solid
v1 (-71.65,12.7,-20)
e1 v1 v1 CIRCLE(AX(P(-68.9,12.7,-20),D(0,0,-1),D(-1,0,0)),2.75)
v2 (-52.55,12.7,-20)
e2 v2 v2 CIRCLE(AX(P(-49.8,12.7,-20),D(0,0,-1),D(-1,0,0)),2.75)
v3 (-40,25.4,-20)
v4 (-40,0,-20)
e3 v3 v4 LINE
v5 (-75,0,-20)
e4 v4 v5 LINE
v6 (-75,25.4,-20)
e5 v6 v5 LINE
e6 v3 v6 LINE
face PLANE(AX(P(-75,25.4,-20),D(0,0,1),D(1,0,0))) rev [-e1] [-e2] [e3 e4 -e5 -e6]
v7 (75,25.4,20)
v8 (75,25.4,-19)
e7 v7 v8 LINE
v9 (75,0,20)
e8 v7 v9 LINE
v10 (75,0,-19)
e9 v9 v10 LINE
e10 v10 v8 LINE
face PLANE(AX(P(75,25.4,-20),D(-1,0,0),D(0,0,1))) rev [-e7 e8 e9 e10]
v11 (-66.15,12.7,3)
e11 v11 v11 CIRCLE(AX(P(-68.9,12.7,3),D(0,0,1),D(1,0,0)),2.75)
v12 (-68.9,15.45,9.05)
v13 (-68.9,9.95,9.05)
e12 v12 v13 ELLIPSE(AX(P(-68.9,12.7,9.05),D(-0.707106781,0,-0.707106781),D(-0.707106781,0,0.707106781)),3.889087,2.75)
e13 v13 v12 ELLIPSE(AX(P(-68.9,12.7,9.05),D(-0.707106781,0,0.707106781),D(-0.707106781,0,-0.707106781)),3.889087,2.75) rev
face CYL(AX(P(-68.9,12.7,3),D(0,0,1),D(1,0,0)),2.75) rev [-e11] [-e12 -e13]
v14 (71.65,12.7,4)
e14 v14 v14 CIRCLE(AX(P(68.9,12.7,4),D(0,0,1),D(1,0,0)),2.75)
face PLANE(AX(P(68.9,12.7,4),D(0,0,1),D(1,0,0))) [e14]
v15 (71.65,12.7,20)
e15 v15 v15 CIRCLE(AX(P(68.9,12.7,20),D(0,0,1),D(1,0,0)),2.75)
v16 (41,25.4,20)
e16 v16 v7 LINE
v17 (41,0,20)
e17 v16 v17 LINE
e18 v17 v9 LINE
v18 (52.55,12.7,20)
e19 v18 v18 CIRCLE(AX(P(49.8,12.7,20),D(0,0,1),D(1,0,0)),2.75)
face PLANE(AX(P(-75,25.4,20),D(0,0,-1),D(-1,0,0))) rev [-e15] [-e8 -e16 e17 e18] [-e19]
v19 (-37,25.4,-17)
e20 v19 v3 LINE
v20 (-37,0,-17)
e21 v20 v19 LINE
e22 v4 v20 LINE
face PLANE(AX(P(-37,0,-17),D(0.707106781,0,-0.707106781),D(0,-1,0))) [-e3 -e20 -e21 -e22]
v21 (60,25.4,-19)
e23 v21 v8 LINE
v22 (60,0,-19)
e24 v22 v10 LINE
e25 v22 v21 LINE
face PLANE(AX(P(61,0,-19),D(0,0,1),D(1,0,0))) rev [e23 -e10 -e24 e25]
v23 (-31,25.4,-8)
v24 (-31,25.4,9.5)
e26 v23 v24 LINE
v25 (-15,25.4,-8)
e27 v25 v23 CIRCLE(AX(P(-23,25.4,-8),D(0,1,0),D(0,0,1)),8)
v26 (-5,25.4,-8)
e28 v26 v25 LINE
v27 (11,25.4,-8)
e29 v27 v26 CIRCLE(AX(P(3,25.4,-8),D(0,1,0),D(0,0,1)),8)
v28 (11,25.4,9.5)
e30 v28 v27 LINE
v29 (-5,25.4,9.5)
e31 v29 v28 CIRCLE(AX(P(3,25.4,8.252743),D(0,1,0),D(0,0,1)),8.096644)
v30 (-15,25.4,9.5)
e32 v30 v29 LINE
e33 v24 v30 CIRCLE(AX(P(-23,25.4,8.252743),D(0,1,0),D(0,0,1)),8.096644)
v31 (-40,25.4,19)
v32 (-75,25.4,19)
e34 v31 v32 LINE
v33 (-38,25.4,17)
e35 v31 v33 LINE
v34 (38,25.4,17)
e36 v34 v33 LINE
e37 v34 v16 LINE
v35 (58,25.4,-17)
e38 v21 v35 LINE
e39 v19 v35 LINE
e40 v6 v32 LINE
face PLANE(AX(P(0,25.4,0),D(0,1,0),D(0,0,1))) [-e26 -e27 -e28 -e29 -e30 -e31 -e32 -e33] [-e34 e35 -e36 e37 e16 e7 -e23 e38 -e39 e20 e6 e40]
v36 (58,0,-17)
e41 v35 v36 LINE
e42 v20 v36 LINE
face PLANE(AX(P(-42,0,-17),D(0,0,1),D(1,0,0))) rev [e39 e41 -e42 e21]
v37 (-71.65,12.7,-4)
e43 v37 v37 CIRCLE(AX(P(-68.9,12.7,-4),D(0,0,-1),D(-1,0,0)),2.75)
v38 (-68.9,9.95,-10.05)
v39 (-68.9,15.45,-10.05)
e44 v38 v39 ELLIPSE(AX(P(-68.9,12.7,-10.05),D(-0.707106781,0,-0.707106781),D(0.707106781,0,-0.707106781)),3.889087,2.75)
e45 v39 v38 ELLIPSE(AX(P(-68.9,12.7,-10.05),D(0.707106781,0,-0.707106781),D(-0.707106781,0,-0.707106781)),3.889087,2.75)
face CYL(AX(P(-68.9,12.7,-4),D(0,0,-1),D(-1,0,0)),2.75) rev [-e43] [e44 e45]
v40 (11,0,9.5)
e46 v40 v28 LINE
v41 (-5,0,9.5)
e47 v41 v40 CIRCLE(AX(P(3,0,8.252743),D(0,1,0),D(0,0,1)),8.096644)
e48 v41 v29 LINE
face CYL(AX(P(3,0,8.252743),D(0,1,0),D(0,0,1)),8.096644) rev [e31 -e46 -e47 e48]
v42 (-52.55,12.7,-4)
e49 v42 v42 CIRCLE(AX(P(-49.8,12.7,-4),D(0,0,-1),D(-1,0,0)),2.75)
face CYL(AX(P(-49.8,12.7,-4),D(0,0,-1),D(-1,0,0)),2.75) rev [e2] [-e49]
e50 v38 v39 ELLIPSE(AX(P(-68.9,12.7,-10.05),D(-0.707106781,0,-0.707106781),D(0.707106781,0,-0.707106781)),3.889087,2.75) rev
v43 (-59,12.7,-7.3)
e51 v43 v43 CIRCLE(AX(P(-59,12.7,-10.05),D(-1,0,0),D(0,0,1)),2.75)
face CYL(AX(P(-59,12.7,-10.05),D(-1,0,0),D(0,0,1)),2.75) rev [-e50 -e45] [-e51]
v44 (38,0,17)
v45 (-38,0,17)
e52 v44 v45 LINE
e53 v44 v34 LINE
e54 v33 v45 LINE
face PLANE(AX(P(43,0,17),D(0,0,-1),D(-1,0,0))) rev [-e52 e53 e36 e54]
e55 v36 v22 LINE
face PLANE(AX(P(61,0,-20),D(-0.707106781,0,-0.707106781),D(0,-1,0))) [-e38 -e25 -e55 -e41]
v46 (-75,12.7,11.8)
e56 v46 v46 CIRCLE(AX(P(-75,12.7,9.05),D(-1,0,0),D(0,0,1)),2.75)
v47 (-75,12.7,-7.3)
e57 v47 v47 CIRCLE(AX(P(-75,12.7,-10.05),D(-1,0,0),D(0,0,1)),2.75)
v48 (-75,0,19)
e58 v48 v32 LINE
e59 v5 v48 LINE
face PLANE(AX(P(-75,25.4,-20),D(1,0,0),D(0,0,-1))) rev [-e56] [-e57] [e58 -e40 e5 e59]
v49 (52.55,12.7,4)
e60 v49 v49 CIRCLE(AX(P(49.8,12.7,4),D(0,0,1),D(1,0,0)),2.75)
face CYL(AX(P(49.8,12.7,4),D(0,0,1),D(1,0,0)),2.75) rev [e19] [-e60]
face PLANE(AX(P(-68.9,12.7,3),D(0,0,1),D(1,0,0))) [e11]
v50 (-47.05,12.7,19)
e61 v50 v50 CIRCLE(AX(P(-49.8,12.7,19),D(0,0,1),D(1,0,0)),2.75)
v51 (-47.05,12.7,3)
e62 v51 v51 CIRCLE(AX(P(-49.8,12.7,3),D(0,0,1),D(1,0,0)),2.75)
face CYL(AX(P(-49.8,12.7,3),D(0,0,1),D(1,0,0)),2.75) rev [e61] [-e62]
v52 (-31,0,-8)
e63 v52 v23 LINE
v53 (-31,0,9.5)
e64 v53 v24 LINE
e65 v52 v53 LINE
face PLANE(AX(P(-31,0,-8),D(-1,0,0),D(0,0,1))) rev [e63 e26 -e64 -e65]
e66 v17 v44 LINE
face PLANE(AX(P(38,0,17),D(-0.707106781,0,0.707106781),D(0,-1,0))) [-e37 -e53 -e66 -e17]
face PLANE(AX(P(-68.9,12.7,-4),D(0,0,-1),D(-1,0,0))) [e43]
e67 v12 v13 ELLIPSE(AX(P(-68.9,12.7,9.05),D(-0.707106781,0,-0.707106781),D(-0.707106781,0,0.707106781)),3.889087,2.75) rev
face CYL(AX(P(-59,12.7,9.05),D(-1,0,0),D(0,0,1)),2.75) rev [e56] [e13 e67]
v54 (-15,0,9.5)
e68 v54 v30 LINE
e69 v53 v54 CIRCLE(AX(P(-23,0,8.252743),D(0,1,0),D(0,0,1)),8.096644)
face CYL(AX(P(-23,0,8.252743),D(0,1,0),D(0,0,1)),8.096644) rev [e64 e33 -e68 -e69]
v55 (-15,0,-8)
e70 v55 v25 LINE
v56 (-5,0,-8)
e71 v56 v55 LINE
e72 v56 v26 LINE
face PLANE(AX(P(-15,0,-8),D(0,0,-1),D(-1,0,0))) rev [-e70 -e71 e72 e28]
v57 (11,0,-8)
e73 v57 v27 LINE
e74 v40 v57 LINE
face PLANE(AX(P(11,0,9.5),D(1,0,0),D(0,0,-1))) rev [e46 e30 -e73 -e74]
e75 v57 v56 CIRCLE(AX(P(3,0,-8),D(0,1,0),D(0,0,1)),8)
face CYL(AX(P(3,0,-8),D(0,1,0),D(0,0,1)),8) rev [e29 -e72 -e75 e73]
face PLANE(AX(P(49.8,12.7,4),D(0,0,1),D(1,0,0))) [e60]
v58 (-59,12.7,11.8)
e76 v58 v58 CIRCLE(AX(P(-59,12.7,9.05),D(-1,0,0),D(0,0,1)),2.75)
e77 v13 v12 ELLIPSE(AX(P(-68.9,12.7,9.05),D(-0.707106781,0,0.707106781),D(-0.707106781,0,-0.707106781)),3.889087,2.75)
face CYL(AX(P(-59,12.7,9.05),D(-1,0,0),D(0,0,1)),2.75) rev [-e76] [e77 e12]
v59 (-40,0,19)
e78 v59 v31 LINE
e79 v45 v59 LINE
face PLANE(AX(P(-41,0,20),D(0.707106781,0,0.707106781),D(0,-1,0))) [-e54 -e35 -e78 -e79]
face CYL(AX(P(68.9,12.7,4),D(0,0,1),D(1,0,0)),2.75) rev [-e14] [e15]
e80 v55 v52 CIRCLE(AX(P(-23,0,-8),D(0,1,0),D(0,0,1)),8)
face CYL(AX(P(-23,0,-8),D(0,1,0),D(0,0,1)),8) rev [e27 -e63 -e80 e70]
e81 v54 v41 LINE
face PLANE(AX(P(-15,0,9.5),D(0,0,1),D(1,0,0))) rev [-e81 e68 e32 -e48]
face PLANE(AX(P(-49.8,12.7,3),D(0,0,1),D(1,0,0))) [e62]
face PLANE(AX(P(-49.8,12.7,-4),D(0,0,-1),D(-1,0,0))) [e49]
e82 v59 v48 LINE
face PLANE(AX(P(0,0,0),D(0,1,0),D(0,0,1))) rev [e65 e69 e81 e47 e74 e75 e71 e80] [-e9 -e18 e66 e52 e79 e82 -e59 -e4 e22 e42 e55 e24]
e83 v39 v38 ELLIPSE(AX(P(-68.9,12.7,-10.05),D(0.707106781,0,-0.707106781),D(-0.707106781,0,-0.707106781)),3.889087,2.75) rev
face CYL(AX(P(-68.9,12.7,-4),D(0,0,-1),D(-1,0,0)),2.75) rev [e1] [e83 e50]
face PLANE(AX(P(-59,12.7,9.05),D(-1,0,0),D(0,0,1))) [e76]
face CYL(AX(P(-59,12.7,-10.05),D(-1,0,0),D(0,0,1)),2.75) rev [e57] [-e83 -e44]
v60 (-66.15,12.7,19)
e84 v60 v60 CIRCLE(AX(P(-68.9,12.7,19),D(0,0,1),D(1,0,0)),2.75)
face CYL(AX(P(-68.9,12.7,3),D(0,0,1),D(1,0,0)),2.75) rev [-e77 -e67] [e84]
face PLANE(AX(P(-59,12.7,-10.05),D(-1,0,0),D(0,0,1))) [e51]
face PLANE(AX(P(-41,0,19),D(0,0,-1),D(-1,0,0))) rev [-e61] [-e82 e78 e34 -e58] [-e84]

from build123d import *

# Parameters (mm, degrees)
CROQUIS1_W              = 150
CROQUIS1_H              = 40
SALIENTE_EXTRUIR1_DEPTH = 25.4
CORTAR_EXTRUIR1_DEPTH   = 82.671047502
CHAFL_N1_SIZE           = 5
CHAFL_N2_SIZE           = 3
CORTAR_EXTRUIR2_DEPTH   = 82.671047502
CROQUIS5_R              = 2.75
CORTAR_EXTRUIR3_DEPTH   = 16
CROQUIS6_R              = 2.75
CORTAR_EXTRUIR4_DEPTH   = 16
CORTAR_EXTRUIR8_START   = -16
CROQUIS7_R              = 2.75
CORTAR_EXTRUIR8_DEPTH   = 16
CROQUIS8_R              = 2.75
CORTAR_EXTRUIR9_DEPTH   = 16


with BuildPart() as part:
    # Croquis1 → Saliente-Extruir1 (new body)
    with BuildSketch(Plane(origin=(0, 0, 0), x_dir=(1, 0, 0), z_dir=(0, 1, 0))):
        Rectangle(CROQUIS1_W, CROQUIS1_H)
    extrude(amount=SALIENTE_EXTRUIR1_DEPTH)

    # Croquis2 → Cortar-Extruir1 (cut, through all)
    with BuildSketch(Plane(origin=(0, 25.4, 0), x_dir=(1, 0, 0), z_dir=(0, 1, 0))):
        Polygon((-42, 20), (-42, 17), (61, 17), (61, 19), (75, 19), (75, 20), (60, 20), align=None)
        Polygon((43, -20), (43, -17), (-41, -17), (-41, -19), (-75, -19), (-75, -20), align=None)
    extrude(amount=-CORTAR_EXTRUIR1_DEPTH, mode=Mode.SUBTRACT)

    # Chaflán1
    # the kernel refuses this chamfer: 5 mm, written as the material it adds along each edge
    with BuildSketch(Plane(origin=(43, 25.4, 17), x_dir=(-0.9996219169112968, 0, -0.027495876610586317), z_dir=(0, -1, 0))) as chafl_n1_piece_1_section:
        Polygon((CHAFL_N1_SIZE * 0.999621916911, -CHAFL_N1_SIZE * 0.0274958766106), (-CHAFL_N1_SIZE * 0.0274958766106, -CHAFL_N1_SIZE * 0.999621916911), (0, 0), align=None)
    chafl_n1_piece_1 = extrude(amount=25.4, mode=Mode.PRIVATE)
    chafl_n1_piece_1 = split(chafl_n1_piece_1, bisect_by=Plane(origin=(41.124952702, 12.7, 20), z_dir=(0, 0, -1)), keep=Keep.TOP, mode=Mode.PRIVATE)
    add(chafl_n1_piece_1)
    with BuildSketch(Plane(origin=(-42, 25.4, -17), x_dir=(-0.027495876610586317, 0, -0.9996219169112968), z_dir=(0, -1, 0))) as chafl_n1_piece_2_section:
        Polygon((CHAFL_N1_SIZE * 0.999621916911, CHAFL_N1_SIZE * 0.0274958766106), (-CHAFL_N1_SIZE * 0.0274958766106, CHAFL_N1_SIZE * 0.999621916911), (0, 0), align=None)
    chafl_n1_piece_2 = extrude(amount=25.4, mode=Mode.PRIVATE)
    chafl_n1_piece_2 = split(chafl_n1_piece_2, bisect_by=Plane(origin=(-40.124952702, 12.7, -20), z_dir=(0, 0, 1)), keep=Keep.TOP, mode=Mode.PRIVATE)
    add(chafl_n1_piece_2)

    # Chaflán2
    # the kernel refuses this chamfer: 3 mm, written as the material it adds along each edge
    with BuildSketch(Plane(origin=(-41, 25.4, 17), x_dir=(-0.027495876610586768, 0, 0.9996219169112968), z_dir=(0, -1, 0))) as chafl_n2_piece_1_section:
        Polygon((CHAFL_N2_SIZE * 0.999621916911, -CHAFL_N2_SIZE * 0.0274958766106), (-CHAFL_N2_SIZE * 0.0274958766106, -CHAFL_N2_SIZE * 0.999621916911), (0, 0), align=None)
    chafl_n2_piece_1 = extrude(amount=25.4, mode=Mode.PRIVATE)
    chafl_n2_piece_1 = split(chafl_n2_piece_1, bisect_by=Plane(origin=(-39.907908995, 12.7, 19), z_dir=(0, 0, -1)), keep=Keep.TOP, mode=Mode.PRIVATE)
    add(chafl_n2_piece_1)
    with BuildSketch(Plane(origin=(61, 25.4, -17), x_dir=(0.027495876610586768, 0, -0.9996219169112968), z_dir=(0, -1, 0))) as chafl_n2_piece_2_section:
        Polygon((CHAFL_N2_SIZE * 0.999621916911, -CHAFL_N2_SIZE * 0.0274958766106), (-CHAFL_N2_SIZE * 0.0274958766106, -CHAFL_N2_SIZE * 0.999621916911), (0, 0), align=None)
    chafl_n2_piece_2 = extrude(amount=25.4, mode=Mode.PRIVATE)
    chafl_n2_piece_2 = split(chafl_n2_piece_2, bisect_by=Plane(origin=(59.907908995, 12.7, -19), z_dir=(0, 0, 1)), keep=Keep.TOP, mode=Mode.PRIVATE)
    add(chafl_n2_piece_2)

    # Croquis3 → Cortar-Extruir2 (cut, through all)
    with BuildSketch(Plane(origin=(0, 25.4, 0), x_dir=(1, 0, 0), z_dir=(0, 1, 0))):
        with BuildLine():
            Line((-15, 8), (-5, 8))
            ThreePointArc((-5, 8), (3, 16), (11, 8))
            Line((11, 8), (11, -9.5))
            ThreePointArc((11, -9.5), (3, -16.34938703), (-5, -9.5))
            Line((-5, -9.5), (-15, -9.5))
            ThreePointArc((-15, -9.5), (-23, -16.349387053), (-31, -9.5))
            Line((-31, -9.5), (-31, 8))
            ThreePointArc((-31, 8), (-23, 16), (-15, 8))
        make_face()
    extrude(amount=-CORTAR_EXTRUIR2_DEPTH, mode=Mode.SUBTRACT)

    # Croquis5 → Cortar-Extruir3 (cut)
    with BuildSketch(Plane(origin=(0, 0, -20), x_dir=(-1, 0, 0), z_dir=(0, 0, -1))):
        with Locations((68.9, 12.7)):
            Circle(CROQUIS5_R)
        with Locations((49.8, 12.7)):
            Circle(CROQUIS5_R)
    extrude(amount=-CORTAR_EXTRUIR3_DEPTH, mode=Mode.SUBTRACT)

    # Croquis6 → Cortar-Extruir4 (cut)
    with BuildSketch(Plane.ZY.offset(75)):
        with Locations((9.05, 12.7)):
            Circle(CROQUIS6_R)
        with Locations((-10.05, 12.7)):
            Circle(CROQUIS6_R)
    extrude(amount=-CORTAR_EXTRUIR4_DEPTH, mode=Mode.SUBTRACT)

    # Croquis7 → Cortar-Extruir8 (cut)
    with BuildSketch(Plane.XY.offset(19).offset(CORTAR_EXTRUIR8_START)):
        with Locations(Location((-68.9, 12.7, 0), (0, 0, 180))):
            Circle(CROQUIS7_R)
        with Locations(Location((-49.8, 12.7, 0), (0, 0, 180))):
            Circle(CROQUIS7_R)
    extrude(amount=CORTAR_EXTRUIR8_DEPTH, mode=Mode.SUBTRACT)

    # Croquis8 → Cortar-Extruir9 (cut)
    with BuildSketch(Plane.XY.offset(20)):
        with Locations((49.8, 12.7)):
            Circle(CROQUIS8_R)
        with Locations((68.9, 12.7)):
            Circle(CROQUIS8_R)
    extrude(amount=-CORTAR_EXTRUIR9_DEPTH, mode=Mode.SUBTRACT)


solid = part.part
